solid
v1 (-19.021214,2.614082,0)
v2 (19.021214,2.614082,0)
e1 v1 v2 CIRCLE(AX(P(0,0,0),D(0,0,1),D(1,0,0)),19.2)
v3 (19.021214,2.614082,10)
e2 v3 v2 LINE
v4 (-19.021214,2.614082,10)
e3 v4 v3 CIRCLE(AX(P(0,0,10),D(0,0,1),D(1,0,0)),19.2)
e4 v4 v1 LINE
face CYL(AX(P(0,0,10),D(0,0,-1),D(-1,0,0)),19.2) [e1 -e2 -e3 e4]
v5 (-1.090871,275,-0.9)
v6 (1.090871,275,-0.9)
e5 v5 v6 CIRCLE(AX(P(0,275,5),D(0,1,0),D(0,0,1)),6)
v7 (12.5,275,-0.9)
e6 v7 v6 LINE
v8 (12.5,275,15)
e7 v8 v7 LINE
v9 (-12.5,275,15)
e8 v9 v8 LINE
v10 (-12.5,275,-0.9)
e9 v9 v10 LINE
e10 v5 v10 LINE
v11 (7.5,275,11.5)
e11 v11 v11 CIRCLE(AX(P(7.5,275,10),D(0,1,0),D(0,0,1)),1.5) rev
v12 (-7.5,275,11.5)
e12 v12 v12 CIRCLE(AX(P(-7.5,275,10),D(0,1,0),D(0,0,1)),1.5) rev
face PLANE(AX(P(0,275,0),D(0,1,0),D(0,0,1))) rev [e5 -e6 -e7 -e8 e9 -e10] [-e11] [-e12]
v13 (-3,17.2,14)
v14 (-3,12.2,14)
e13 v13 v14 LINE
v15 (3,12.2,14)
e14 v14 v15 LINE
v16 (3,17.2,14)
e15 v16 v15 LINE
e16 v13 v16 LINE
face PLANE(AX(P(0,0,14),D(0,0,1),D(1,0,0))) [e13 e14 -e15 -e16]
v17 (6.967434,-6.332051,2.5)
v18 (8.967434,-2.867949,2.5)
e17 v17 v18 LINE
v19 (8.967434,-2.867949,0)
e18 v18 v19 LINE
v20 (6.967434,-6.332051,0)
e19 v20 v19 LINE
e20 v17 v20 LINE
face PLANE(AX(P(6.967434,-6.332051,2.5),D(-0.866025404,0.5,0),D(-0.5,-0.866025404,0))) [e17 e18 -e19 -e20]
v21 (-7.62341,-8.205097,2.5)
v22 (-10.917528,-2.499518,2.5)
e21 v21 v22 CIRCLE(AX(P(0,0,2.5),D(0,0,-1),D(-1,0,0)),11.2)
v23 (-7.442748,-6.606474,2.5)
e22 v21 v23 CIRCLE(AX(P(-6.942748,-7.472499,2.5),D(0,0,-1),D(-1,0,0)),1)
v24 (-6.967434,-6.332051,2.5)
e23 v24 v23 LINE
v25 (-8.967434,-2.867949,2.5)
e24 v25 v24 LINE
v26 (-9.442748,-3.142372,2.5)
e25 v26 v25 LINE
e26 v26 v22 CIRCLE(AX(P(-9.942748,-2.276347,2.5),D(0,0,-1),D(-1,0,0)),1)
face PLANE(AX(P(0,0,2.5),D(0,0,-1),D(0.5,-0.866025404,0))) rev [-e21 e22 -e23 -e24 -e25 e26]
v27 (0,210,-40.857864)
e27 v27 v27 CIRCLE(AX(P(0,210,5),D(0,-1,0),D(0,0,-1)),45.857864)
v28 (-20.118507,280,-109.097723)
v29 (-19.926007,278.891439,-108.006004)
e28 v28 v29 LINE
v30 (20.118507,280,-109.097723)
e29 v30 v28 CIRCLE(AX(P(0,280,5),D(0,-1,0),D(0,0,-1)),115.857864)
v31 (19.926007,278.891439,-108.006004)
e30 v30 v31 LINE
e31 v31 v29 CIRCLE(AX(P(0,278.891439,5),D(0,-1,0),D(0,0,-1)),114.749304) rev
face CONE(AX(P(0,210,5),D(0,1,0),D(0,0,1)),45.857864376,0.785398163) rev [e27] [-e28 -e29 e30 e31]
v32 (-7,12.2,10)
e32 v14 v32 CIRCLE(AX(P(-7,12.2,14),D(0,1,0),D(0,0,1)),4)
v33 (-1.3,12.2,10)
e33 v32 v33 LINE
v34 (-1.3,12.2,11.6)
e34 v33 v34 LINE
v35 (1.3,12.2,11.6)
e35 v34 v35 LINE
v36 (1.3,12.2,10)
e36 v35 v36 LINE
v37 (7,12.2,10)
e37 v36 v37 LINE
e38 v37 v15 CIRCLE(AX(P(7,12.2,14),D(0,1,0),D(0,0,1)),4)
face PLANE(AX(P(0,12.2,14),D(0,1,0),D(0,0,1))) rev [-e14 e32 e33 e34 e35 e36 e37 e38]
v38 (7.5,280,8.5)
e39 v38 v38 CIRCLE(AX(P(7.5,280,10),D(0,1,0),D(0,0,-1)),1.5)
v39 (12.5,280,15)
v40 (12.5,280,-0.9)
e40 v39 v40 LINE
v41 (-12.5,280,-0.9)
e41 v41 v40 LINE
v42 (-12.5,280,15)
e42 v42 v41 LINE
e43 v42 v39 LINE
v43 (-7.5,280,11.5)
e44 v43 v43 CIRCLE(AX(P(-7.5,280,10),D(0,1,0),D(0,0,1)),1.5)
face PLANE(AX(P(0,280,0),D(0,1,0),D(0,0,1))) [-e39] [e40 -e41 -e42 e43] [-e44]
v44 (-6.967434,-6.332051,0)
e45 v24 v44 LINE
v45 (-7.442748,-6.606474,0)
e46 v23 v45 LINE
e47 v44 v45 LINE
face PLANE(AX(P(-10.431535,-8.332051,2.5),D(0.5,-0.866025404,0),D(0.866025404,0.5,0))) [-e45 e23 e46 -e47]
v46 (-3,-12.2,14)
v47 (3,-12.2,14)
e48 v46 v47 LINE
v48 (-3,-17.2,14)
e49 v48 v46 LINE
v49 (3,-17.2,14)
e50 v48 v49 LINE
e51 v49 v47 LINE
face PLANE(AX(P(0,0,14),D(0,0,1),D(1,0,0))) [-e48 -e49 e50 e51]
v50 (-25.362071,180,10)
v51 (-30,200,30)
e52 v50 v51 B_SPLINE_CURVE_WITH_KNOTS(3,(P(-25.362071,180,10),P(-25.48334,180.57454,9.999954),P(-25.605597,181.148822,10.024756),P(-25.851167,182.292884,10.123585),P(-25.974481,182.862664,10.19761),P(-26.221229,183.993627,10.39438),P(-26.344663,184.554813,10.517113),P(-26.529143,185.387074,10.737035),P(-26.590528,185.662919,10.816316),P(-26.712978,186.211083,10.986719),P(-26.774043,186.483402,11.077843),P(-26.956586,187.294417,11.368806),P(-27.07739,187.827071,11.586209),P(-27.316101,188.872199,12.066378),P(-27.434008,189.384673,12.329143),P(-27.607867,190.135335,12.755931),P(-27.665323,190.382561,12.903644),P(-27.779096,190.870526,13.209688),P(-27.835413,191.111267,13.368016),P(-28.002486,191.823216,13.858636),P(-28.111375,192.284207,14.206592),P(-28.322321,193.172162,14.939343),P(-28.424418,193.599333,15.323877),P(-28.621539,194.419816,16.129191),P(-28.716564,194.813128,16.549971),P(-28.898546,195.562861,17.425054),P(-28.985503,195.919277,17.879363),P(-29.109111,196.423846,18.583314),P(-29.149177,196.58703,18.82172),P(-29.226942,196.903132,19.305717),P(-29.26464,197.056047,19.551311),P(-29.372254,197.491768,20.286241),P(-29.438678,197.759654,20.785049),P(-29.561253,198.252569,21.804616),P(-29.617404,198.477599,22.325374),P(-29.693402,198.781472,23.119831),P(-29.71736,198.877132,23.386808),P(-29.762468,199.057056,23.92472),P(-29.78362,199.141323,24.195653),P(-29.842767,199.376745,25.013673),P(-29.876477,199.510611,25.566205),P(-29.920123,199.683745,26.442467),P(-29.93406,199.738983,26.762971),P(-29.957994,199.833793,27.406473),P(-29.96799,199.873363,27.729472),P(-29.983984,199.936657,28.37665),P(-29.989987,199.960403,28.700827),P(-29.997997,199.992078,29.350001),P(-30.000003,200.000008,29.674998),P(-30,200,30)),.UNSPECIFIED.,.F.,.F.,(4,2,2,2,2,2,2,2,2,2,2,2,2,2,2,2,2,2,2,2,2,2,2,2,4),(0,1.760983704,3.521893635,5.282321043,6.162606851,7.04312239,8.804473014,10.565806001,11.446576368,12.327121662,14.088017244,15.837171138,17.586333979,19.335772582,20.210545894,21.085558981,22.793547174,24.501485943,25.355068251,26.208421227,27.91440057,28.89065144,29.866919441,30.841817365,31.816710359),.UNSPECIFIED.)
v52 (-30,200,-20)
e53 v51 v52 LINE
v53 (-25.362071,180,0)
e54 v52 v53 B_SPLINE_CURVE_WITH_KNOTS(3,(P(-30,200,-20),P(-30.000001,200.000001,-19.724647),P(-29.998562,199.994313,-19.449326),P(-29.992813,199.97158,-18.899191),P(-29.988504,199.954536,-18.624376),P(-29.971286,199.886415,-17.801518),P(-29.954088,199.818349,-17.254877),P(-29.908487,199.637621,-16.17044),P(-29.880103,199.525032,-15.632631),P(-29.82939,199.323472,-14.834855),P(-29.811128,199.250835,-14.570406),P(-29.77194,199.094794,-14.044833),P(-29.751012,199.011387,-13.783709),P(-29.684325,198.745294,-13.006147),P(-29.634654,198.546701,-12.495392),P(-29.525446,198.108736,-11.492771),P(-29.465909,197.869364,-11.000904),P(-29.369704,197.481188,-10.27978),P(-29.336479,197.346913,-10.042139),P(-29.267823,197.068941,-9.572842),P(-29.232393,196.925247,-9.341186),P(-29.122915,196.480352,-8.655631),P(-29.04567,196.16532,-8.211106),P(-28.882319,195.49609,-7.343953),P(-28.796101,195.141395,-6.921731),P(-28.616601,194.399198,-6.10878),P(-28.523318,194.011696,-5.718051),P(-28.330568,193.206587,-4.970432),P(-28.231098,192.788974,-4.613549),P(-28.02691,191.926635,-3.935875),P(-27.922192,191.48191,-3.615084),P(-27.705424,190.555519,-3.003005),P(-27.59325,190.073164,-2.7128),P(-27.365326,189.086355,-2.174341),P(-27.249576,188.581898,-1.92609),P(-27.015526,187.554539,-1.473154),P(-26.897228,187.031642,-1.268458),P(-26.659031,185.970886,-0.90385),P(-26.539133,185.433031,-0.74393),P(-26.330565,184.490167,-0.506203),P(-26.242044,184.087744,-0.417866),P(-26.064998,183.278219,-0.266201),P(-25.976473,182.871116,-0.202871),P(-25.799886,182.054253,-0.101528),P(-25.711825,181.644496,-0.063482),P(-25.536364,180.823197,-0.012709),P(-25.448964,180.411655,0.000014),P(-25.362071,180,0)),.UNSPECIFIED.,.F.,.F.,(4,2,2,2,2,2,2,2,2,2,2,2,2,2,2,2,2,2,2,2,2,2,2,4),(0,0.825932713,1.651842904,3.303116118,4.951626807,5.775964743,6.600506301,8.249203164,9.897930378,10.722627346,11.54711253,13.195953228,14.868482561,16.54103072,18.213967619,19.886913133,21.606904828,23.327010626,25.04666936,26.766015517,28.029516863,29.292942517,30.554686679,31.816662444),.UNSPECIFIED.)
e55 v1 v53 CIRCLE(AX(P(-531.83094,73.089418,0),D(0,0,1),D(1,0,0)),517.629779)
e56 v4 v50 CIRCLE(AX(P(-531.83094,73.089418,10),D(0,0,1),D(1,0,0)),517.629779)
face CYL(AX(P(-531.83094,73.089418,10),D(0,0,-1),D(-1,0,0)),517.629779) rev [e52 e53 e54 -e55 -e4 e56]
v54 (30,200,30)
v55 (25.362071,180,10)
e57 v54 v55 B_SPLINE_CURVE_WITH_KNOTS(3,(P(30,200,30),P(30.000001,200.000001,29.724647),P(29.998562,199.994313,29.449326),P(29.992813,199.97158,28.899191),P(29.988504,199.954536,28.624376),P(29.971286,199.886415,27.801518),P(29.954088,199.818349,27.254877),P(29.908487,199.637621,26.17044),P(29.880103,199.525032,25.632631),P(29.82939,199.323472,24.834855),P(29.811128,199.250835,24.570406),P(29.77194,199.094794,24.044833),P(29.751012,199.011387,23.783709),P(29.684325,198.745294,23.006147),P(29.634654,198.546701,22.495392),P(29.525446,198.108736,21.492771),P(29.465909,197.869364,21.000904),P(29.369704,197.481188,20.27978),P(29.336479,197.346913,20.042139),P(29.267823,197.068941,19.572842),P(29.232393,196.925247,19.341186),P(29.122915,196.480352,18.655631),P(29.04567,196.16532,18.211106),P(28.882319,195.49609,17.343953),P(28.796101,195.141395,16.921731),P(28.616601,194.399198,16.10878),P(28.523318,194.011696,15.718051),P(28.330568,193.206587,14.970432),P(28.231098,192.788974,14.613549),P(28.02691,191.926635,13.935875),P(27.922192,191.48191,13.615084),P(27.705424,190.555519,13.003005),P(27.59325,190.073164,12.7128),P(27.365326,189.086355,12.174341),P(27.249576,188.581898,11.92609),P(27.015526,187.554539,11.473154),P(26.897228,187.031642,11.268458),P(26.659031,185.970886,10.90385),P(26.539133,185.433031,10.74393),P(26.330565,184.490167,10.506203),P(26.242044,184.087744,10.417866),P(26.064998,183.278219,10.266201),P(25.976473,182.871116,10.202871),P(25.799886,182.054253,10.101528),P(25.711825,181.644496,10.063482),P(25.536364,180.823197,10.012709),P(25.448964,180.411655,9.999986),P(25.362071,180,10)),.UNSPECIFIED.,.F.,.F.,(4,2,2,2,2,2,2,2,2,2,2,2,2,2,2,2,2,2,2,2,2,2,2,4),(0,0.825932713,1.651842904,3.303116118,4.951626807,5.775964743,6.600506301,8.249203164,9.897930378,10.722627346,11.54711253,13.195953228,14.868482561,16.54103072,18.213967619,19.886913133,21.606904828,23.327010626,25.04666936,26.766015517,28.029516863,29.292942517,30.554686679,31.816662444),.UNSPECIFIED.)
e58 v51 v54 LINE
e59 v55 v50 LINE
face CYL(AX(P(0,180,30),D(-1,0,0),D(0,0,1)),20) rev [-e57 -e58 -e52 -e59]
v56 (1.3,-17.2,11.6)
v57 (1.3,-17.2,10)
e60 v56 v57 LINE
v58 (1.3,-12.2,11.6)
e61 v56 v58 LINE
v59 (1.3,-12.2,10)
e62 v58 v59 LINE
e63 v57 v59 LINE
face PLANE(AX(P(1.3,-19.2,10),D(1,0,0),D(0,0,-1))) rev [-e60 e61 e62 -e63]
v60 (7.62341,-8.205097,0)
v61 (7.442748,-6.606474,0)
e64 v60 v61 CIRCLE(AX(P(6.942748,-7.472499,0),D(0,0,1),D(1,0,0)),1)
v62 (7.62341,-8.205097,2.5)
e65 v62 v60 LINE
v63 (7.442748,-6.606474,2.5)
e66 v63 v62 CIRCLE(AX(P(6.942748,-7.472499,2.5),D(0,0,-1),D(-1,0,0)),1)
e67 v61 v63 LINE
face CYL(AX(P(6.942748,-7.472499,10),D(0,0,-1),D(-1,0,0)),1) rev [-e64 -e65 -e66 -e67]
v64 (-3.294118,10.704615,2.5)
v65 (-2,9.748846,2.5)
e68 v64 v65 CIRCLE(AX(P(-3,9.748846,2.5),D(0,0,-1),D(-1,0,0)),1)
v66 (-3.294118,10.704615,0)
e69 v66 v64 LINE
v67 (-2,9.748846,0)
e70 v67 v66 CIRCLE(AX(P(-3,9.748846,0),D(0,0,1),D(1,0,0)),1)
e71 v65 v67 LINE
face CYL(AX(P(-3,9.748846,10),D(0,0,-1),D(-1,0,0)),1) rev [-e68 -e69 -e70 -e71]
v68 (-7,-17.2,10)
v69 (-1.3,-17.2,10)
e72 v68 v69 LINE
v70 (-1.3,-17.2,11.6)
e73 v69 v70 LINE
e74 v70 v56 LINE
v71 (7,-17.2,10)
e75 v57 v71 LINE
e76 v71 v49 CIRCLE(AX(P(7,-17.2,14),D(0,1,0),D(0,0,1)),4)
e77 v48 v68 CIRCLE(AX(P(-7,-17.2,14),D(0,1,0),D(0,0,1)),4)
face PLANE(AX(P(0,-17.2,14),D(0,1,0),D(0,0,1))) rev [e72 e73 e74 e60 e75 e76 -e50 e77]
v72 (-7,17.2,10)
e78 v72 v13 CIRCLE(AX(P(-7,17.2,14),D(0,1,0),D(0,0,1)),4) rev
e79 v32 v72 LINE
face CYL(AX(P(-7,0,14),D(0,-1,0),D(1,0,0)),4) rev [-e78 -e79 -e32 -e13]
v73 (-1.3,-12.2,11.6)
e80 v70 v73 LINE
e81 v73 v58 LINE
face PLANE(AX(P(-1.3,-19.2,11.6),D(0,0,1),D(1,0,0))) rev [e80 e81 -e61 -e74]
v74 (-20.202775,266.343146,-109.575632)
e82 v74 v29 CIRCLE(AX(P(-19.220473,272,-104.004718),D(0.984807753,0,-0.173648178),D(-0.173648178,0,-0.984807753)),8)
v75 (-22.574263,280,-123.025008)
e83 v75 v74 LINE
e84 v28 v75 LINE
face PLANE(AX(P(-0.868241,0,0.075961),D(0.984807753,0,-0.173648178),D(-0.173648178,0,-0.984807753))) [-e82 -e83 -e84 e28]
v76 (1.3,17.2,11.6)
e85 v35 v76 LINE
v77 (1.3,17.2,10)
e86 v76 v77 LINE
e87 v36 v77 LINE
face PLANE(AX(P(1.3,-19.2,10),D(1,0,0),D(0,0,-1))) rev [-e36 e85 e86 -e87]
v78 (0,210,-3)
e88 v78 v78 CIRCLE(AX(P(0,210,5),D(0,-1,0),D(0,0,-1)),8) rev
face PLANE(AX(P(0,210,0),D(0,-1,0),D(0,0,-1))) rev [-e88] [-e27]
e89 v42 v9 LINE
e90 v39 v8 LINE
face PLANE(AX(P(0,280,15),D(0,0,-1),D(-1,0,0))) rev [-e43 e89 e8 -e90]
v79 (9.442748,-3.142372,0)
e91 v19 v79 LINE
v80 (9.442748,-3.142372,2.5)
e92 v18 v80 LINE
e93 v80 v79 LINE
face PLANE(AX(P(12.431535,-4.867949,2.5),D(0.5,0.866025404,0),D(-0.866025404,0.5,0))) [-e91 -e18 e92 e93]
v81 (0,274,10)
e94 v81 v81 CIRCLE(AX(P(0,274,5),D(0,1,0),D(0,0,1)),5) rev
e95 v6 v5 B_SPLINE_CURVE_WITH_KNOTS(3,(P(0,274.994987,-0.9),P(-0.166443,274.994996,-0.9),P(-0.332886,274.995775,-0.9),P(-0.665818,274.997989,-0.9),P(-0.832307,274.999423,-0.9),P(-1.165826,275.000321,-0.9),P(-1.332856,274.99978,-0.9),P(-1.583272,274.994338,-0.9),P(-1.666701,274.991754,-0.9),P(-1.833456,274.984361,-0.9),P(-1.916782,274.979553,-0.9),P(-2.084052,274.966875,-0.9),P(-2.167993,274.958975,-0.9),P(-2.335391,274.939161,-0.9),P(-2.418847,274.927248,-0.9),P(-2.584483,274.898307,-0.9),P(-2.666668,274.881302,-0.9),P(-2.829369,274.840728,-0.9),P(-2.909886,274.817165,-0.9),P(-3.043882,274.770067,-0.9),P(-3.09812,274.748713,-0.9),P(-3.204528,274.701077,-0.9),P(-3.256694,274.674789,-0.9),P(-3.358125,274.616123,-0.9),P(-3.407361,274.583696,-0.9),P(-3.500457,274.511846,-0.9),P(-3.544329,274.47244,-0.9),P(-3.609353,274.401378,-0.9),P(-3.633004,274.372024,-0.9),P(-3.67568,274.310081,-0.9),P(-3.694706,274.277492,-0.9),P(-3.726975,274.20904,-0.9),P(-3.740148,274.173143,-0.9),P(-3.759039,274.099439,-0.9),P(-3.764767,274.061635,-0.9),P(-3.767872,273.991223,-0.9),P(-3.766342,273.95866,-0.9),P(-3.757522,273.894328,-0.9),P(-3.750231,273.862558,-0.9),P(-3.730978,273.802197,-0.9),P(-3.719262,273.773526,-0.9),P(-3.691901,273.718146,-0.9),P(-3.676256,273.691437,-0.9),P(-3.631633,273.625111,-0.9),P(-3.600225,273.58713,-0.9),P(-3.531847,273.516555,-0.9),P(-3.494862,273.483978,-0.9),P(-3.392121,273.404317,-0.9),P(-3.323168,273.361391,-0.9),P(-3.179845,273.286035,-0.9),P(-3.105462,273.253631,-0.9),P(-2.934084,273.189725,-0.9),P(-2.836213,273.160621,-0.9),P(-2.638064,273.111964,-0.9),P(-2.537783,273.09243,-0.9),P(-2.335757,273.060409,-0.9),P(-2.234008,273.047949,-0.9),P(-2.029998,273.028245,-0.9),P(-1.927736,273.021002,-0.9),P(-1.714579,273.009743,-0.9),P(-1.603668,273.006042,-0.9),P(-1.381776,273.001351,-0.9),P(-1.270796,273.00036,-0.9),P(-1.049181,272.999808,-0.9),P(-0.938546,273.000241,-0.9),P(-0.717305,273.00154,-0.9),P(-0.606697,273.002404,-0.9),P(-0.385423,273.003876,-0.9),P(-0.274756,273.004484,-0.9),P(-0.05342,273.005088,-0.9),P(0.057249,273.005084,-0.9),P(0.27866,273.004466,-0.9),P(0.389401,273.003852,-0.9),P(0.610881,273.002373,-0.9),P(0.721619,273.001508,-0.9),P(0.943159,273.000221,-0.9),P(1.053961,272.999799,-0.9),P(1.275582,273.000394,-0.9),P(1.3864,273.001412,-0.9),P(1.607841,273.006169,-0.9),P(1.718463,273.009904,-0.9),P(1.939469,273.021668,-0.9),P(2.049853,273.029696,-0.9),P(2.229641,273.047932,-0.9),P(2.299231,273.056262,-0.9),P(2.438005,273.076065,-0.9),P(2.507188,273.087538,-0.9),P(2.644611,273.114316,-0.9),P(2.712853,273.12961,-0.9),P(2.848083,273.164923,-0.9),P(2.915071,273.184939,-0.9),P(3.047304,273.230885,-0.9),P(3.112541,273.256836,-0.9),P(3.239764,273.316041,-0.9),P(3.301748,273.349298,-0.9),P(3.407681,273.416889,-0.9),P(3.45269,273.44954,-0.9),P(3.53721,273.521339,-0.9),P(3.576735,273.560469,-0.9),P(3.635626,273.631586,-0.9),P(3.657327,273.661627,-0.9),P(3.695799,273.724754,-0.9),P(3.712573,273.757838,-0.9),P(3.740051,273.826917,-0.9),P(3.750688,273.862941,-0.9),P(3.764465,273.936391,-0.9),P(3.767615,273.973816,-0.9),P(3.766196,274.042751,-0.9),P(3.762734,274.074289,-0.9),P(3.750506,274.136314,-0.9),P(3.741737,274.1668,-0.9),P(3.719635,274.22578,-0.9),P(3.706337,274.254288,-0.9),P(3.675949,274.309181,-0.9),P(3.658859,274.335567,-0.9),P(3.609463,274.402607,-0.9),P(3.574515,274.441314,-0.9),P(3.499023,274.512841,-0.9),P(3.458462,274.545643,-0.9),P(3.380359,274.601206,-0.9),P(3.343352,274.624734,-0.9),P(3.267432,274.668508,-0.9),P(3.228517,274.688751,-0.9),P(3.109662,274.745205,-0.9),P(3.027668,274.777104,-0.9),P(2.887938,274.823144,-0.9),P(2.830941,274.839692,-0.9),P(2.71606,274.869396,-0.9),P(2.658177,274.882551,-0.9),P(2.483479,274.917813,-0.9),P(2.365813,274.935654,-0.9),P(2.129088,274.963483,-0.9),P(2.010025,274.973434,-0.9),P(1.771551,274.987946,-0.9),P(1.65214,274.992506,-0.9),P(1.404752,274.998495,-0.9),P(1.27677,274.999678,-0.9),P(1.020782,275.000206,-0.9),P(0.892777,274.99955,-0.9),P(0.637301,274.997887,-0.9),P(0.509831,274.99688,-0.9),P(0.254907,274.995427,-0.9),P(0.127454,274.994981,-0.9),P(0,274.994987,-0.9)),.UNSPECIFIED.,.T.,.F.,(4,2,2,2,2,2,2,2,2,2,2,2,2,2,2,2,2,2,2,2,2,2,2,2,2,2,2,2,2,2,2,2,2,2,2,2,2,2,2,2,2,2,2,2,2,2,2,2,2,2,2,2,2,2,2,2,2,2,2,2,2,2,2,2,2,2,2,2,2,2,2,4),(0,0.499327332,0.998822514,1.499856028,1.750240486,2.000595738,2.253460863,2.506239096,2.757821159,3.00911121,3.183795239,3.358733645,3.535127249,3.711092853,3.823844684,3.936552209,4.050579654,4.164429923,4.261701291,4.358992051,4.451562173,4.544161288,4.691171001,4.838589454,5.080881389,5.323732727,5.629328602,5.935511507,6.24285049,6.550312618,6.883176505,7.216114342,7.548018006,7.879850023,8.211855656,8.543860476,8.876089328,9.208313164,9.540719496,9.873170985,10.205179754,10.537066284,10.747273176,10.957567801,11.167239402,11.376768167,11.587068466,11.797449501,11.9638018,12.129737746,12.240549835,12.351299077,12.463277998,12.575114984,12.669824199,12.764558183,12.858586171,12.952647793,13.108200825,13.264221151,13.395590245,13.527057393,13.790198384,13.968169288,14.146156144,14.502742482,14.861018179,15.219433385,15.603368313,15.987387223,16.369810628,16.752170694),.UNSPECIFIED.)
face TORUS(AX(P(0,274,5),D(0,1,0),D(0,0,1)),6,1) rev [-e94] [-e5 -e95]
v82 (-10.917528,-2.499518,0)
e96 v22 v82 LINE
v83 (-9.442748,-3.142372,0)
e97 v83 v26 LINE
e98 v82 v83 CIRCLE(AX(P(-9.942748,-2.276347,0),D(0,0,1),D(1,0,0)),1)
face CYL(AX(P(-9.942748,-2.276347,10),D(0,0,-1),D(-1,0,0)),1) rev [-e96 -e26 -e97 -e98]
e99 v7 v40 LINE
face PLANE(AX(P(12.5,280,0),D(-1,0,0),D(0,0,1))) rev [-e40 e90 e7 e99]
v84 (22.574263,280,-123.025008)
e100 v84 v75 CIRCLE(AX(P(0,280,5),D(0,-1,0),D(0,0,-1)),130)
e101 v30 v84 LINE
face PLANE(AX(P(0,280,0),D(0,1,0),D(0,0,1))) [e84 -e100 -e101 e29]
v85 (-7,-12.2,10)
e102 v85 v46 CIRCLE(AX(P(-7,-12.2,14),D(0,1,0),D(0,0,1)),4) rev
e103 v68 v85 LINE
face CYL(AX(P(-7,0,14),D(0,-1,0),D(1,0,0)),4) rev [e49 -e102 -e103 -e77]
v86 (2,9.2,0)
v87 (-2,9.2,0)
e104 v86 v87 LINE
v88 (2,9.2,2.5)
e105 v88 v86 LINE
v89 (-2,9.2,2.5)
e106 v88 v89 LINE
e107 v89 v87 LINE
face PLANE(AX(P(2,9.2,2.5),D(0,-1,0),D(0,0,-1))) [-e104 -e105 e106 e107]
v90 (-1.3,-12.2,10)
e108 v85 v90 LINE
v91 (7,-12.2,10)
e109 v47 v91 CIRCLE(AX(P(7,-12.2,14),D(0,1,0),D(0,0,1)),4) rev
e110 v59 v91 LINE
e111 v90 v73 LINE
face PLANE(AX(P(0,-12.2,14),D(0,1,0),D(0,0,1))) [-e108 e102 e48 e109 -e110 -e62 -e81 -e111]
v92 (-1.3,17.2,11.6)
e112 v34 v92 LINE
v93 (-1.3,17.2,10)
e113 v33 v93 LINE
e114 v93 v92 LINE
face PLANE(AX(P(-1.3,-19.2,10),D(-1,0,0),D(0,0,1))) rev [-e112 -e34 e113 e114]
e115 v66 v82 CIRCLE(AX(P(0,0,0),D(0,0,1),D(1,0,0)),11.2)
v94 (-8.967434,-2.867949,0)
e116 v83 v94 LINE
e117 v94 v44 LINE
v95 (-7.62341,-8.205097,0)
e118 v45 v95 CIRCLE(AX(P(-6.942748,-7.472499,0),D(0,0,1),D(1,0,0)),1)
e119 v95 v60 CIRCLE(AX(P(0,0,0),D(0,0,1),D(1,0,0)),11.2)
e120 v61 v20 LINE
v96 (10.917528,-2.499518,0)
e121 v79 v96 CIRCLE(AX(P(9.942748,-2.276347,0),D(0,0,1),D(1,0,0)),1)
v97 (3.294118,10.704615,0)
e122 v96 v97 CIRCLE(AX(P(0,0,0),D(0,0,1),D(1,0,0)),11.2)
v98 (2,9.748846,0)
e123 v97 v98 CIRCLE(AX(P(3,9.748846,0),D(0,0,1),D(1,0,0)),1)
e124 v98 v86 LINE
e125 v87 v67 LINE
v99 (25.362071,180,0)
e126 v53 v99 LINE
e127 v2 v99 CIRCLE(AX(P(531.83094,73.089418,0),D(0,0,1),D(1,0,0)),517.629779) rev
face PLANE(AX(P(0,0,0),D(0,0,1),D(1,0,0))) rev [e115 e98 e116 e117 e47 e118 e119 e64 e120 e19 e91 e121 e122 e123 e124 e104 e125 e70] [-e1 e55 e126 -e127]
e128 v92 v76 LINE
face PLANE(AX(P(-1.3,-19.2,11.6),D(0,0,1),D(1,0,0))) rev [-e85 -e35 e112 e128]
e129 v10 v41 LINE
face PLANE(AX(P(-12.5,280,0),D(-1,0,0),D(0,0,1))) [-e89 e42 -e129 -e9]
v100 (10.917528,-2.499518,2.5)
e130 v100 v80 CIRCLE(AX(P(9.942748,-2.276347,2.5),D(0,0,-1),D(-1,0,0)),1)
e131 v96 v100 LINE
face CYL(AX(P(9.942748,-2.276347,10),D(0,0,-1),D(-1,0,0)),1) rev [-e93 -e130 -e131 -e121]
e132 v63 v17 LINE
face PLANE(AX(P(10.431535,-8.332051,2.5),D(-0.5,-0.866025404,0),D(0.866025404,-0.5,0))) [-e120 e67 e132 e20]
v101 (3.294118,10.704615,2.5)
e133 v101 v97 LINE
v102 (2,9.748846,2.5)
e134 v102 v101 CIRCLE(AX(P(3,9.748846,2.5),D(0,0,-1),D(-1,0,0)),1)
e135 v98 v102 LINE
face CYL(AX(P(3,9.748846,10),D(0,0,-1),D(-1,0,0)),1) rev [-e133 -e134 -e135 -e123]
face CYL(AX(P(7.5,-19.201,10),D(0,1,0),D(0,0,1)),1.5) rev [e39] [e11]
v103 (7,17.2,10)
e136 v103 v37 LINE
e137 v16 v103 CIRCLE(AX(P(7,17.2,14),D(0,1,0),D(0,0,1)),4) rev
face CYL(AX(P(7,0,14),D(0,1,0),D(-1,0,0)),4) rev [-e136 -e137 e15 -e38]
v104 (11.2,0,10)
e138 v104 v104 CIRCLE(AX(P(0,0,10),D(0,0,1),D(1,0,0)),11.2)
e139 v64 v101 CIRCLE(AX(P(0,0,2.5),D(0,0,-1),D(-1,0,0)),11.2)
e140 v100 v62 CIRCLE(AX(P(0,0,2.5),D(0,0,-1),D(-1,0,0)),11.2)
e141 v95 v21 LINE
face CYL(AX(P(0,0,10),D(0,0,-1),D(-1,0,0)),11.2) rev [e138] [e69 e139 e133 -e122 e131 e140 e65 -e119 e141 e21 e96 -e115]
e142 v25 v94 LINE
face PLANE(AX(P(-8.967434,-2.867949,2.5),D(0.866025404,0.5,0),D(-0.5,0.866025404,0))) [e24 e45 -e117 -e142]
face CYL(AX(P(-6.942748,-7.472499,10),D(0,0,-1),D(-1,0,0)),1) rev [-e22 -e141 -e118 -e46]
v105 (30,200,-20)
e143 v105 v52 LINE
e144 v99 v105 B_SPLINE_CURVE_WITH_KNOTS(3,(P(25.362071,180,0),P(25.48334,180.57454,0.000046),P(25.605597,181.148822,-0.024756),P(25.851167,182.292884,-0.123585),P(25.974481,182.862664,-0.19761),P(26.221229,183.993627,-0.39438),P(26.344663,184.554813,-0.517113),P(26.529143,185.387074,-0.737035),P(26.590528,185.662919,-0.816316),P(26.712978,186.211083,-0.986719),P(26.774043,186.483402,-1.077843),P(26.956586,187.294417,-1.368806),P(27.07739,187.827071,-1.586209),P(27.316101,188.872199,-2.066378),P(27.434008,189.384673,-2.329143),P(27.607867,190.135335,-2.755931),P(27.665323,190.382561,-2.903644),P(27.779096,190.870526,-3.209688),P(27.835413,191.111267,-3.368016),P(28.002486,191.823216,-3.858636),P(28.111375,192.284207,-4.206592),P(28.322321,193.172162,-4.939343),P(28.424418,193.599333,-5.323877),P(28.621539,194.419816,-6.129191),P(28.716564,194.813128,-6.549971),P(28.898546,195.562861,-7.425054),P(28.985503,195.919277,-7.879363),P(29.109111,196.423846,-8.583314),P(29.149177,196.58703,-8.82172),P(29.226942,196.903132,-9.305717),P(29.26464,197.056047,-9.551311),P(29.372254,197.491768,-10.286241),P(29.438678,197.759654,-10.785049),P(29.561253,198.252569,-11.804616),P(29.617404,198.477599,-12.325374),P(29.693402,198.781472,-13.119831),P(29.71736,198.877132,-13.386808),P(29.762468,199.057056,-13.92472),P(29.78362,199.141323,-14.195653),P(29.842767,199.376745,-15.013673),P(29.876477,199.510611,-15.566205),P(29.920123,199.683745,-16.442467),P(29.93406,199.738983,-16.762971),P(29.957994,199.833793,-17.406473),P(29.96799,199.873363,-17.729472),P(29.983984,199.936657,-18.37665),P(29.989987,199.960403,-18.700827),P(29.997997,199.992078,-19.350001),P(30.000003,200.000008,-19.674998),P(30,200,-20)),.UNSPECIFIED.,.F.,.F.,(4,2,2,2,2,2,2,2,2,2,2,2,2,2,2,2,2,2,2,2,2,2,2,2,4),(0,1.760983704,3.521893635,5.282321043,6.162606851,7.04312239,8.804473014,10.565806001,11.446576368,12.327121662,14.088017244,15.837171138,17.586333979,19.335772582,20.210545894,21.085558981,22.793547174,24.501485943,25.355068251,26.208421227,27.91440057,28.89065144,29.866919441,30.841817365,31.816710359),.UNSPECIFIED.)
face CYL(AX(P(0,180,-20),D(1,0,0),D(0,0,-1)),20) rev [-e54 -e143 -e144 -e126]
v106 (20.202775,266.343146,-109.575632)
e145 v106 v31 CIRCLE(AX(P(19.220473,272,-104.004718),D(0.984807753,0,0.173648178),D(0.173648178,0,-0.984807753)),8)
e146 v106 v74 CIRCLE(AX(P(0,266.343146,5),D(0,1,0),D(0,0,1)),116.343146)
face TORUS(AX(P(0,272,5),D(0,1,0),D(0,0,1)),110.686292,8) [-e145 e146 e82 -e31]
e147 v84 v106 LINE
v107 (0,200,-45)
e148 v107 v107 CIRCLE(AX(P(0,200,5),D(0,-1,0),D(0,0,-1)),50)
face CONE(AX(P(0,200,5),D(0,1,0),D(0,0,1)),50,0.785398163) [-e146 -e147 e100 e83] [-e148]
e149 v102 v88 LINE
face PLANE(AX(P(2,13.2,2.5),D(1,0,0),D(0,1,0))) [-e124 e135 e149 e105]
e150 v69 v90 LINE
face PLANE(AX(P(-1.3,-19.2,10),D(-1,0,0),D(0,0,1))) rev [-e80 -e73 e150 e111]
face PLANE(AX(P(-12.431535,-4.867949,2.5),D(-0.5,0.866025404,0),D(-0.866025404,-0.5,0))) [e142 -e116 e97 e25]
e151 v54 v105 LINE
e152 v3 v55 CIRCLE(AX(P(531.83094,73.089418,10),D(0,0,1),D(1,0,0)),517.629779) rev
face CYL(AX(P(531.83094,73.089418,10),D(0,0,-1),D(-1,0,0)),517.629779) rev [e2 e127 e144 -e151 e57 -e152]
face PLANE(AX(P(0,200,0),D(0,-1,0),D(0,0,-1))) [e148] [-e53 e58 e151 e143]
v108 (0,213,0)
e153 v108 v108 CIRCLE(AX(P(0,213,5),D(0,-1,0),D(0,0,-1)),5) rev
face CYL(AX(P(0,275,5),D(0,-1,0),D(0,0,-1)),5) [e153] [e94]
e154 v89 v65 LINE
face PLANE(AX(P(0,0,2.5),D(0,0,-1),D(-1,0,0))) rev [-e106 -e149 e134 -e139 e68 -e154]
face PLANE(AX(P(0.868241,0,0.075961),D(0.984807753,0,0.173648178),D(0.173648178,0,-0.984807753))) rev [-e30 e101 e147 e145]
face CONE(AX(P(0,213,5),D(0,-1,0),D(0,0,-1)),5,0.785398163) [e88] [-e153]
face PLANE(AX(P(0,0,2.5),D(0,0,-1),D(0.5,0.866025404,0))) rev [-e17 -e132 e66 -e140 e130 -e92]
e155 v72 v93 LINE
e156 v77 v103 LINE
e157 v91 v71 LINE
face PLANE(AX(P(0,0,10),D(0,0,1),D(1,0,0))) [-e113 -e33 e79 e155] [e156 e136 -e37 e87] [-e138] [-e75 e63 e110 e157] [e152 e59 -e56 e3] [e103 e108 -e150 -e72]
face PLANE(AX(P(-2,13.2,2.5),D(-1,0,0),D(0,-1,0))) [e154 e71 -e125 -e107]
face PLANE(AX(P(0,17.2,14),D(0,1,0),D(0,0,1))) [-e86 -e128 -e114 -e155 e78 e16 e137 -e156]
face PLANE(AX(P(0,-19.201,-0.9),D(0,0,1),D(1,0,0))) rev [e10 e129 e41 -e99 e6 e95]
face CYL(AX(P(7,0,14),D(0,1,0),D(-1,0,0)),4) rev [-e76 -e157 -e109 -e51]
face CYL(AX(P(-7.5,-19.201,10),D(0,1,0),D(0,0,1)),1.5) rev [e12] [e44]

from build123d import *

# Parameters (mm, degrees)
SKETCH1_R               = 19.2
SKETCH1_R_2             = 11.2
BOSS_EXTRUDE1_DEPTH     = 10
SKETCH3_W               = 3
SKETCH3_H               = 5
SKETCH3_W_2             = 6
BOSS_EXTRUDE3_DEPTH     = 4
FILLET6_R               = 4
CUT_EXTRUDE1_DEPTH      = 186.773625685
CUT_EXTRUDE1_DEPTH_BACK = 186.773625685
SKETCH5_W               = 2.6
SKETCH5_H               = 1.6
FILLET7_R               = 20
SKETCH7_R               = 5
BOSS_EXTRUDE4_DEPTH     = 65
SKETCH8_W               = 25
SKETCH8_H               = 20
BOSS_EXTRUDE5_DEPTH     = 5
SKETCH10_R              = 1.5
CUT_EXTRUDE2_DEPTH      = 5
FILLET8_R               = 1
SKETCH2_W               = 4
SKETCH2_H               = 4
BOSS_EXTRUDE6_DEPTH     = 2.5
CIRPATTERN1_COUNT       = 3
FILLET9_R               = 1
CUT_REVOLVE1_ANGLE      = 20
CUT_EXTRUDE3_REACH      = 355.052
SKETCH14_W              = 25
SKETCH14_H              = 4.1


with BuildPart() as part:
    # Sketch1 → Boss-Extrude1 (new body)
    # profile 1 of 2: a face of its own
    with BuildSketch(Plane.XY):
        with BuildLine():
            Line((30, 200), (-30, 200))
            ThreePointArc((-30, 200), (-15, 101.836029472), (-19.021213884, 2.614081554))
            ThreePointArc((-19.021213884, 2.614081554), (0, 19.2), (19.021213884, 2.614081554))
            ThreePointArc((19.021213884, 2.614081554), (15, 101.836029472), (30, 200))
        make_face()
    # profile 2 of 2: a face of its own
    with BuildSketch(Plane.XY):
        Circle(SKETCH1_R)
        Circle(SKETCH1_R_2, mode=Mode.SUBTRACT)
    extrude(amount=BOSS_EXTRUDE1_DEPTH)

    # Sketch3 → Boss-Extrude3 (add)
    with BuildSketch(Plane.XY.offset(10)):
        with Locations((1.5, 14.7)):
            Rectangle(SKETCH3_W, SKETCH3_H)
        with Locations((-1.5, 14.7)):
            Rectangle(SKETCH3_W, SKETCH3_H)
        with Locations((0, -14.7)):
            Rectangle(SKETCH3_W_2, SKETCH3_H)
    extrude(amount=BOSS_EXTRUDE3_DEPTH)

    # Fillet6
    fillet6_edges = [part.edges().sort_by_distance(p)[0] for p in [
        (-3, -14.7, 10),
        (3, -14.7, 10),
        (3, 14.7, 10),
        (-3, 14.7, 10),
    ]]
    fillet(fillet6_edges, radius=FILLET6_R - 0.0001)  # a hair under: the kernel refuses the full size

    # Sketch5 → Cut-Extrude1 (cut, two sides: drawn at the far end of the back side and taken through both)
    with BuildSketch(Plane(origin=(0, 17.2, 0), x_dir=(1, 0, 0), z_dir=(0, 1, 0)).offset(-CUT_EXTRUDE1_DEPTH_BACK)):
        with Locations((0, -10.8)):
            Rectangle(SKETCH5_W, SKETCH5_H)
    extrude(amount=CUT_EXTRUDE1_DEPTH + CUT_EXTRUDE1_DEPTH_BACK, mode=Mode.SUBTRACT)

    # Sketch6 → Revolve1 (revolve)
    with BuildSketch(Plane(origin=(0, 0, 0), x_dir=(0, 0, -1), z_dir=(1, 0, 0))):
        Polygon((-5, 210), (-5, 200), (45, 200), (125, 280), (110.857864376, 280), (100.857864376, 270), (40.857864376, 210), (5, 210), align=None)
    revolve(axis=Axis((0, 200, 5), (0, 1, 0)))

    # Fillet7
    fillet7_edges = [part.edges().sort_by_distance(p)[0] for p in [
        (0, 200, 10),
        (0, 200, 0),
    ]]
    fillet(fillet7_edges, radius=FILLET7_R)



with BuildPart() as body_2:
    # Sketch7 → Boss-Extrude4 (new body)
    with BuildSketch(Plane(origin=(0, 210, 0), x_dir=(1, 0, 0), z_dir=(0, 1, 0))):
        with Locations(Location((0, -5, 0), (0, 0, 270))):
            Circle(SKETCH7_R)
    extrude(amount=BOSS_EXTRUDE4_DEPTH)

    # Sketch8 → Boss-Extrude5 (add)
    with BuildSketch(Plane(origin=(0, 275, 0), x_dir=(1, 0, 0), z_dir=(0, 1, 0))):
        with Locations((0, -5)):
            Rectangle(SKETCH8_W, SKETCH8_H)
    extrude(amount=BOSS_EXTRUDE5_DEPTH)

    # Sketch10 → Cut-Extrude2 (cut)
    with BuildSketch(Plane(origin=(0, 280, 0), x_dir=(1, 0, 0), z_dir=(0, 1, 0))):
        with Locations(Location((-7.5, -10, 0), (0, 0, 270))):
            Circle(SKETCH10_R)
        with Locations(Location((7.5, -10, 0), (0, 0, 270))):
            Circle(SKETCH10_R)
    extrude(amount=-CUT_EXTRUDE2_DEPTH, mode=Mode.SUBTRACT)

    # Fillet8
    fillet8_edges = [body_2.edges().sort_by_distance(p)[0] for p in [
        (0, 275, 0),
    ]]
    fillet(fillet8_edges, radius=FILLET8_R)


with BuildPart() as part_1:
    add(part.part)

    add(body_2.part)  # Revolve2 merges body 2
    # Sketch12 → Revolve2 (revolve)
    with BuildSketch(Plane.XY.offset(5), mode=Mode.PRIVATE) as revolve2_sk:
        Polygon((5, 210), (5, 213), (8, 210), align=None)
    revolve(revolve2_sk.sketch.rotate(Axis((0, 210, 5), (0, 1, 0)), 90), axis=Axis((0, 210, 5), (0, 1, 0)))

    # Sketch2 → Boss-Extrude6 (add)
    with BuildSketch(Plane(origin=(0, 0, 0), x_dir=(-1, 0, 0), z_dir=(0, 0, -1))):
        with Locations((0, 11.2)):
            Rectangle(SKETCH2_W, SKETCH2_H)
    boss_extrude6 = extrude(amount=-BOSS_EXTRUDE6_DEPTH)

    # CirPattern1: Boss-Extrude6 ×3 about axis
    cirpattern1_axis = Axis((0, 0, 0), (0, 0, 1))
    for i in range(1, CIRPATTERN1_COUNT):
        add(boss_extrude6.rotate(cirpattern1_axis, i * 360 / CIRPATTERN1_COUNT))

    # Fillet9
    fillet9_edges = [part_1.edges().sort_by_distance(p)[0] for p in [
        (-2, 11.019981851, 1.25),
        (2, 11.019981851, 1.25),
        (10.543584232, -3.777940118, 1.25),
        (8.543584232, -7.242041733, 1.25),
        (-8.543584232, -7.242041733, 1.25),
        (-10.543584232, -3.777940118, 1.25),
    ]]
    fillet(fillet9_edges, radius=FILLET9_R)

    # Sketch13 → Cut-Revolve1 (revolve, symmetric, cut)
    with BuildSketch(Plane(origin=(0, 0, 0), x_dir=(0, 0, -1), z_dir=(1, 0, 0))) as cut_revolve1_sk:
        with BuildLine():
            ThreePointArc((111.343145751, 266.343145751), (113.077327761, 275.061467459), (105.686291501, 280))
            Line((105.686291501, 280), (125, 280))
            Line((125, 280), (111.343145751, 266.343145751))
        make_face()
    revolve(axis=Axis((0, 274, 5), (0, -1, 0)), revolution_arc=CUT_REVOLVE1_ANGLE / 2, mode=Mode.SUBTRACT)
    revolve(cut_revolve1_sk.sketch, axis=Axis((0, 274, 5), (0, 1, 0)), revolution_arc=CUT_REVOLVE1_ANGLE / 2, mode=Mode.SUBTRACT)

    # Sketch14 → Cut-Extrude3 (cut, up to next)
    with BuildSketch(Plane(origin=(0, 280, 0), x_dir=(1, 0, 0), z_dir=(0, 1, 0)), mode=Mode.PRIVATE) as cut_extrude3_sk1:
        with Locations((0, 2.95)):
            Rectangle(SKETCH14_W, SKETCH14_H)
    cut_extrude3_tool1 = extrude(cut_extrude3_sk1.sketch, amount=-CUT_EXTRUDE3_REACH, mode=Mode.PRIVATE) & part_1.part
    add(cut_extrude3_tool1.solids().sort_by_distance((0, 280, -2.95))[0], mode=Mode.SUBTRACT)


solid = part_1.part
